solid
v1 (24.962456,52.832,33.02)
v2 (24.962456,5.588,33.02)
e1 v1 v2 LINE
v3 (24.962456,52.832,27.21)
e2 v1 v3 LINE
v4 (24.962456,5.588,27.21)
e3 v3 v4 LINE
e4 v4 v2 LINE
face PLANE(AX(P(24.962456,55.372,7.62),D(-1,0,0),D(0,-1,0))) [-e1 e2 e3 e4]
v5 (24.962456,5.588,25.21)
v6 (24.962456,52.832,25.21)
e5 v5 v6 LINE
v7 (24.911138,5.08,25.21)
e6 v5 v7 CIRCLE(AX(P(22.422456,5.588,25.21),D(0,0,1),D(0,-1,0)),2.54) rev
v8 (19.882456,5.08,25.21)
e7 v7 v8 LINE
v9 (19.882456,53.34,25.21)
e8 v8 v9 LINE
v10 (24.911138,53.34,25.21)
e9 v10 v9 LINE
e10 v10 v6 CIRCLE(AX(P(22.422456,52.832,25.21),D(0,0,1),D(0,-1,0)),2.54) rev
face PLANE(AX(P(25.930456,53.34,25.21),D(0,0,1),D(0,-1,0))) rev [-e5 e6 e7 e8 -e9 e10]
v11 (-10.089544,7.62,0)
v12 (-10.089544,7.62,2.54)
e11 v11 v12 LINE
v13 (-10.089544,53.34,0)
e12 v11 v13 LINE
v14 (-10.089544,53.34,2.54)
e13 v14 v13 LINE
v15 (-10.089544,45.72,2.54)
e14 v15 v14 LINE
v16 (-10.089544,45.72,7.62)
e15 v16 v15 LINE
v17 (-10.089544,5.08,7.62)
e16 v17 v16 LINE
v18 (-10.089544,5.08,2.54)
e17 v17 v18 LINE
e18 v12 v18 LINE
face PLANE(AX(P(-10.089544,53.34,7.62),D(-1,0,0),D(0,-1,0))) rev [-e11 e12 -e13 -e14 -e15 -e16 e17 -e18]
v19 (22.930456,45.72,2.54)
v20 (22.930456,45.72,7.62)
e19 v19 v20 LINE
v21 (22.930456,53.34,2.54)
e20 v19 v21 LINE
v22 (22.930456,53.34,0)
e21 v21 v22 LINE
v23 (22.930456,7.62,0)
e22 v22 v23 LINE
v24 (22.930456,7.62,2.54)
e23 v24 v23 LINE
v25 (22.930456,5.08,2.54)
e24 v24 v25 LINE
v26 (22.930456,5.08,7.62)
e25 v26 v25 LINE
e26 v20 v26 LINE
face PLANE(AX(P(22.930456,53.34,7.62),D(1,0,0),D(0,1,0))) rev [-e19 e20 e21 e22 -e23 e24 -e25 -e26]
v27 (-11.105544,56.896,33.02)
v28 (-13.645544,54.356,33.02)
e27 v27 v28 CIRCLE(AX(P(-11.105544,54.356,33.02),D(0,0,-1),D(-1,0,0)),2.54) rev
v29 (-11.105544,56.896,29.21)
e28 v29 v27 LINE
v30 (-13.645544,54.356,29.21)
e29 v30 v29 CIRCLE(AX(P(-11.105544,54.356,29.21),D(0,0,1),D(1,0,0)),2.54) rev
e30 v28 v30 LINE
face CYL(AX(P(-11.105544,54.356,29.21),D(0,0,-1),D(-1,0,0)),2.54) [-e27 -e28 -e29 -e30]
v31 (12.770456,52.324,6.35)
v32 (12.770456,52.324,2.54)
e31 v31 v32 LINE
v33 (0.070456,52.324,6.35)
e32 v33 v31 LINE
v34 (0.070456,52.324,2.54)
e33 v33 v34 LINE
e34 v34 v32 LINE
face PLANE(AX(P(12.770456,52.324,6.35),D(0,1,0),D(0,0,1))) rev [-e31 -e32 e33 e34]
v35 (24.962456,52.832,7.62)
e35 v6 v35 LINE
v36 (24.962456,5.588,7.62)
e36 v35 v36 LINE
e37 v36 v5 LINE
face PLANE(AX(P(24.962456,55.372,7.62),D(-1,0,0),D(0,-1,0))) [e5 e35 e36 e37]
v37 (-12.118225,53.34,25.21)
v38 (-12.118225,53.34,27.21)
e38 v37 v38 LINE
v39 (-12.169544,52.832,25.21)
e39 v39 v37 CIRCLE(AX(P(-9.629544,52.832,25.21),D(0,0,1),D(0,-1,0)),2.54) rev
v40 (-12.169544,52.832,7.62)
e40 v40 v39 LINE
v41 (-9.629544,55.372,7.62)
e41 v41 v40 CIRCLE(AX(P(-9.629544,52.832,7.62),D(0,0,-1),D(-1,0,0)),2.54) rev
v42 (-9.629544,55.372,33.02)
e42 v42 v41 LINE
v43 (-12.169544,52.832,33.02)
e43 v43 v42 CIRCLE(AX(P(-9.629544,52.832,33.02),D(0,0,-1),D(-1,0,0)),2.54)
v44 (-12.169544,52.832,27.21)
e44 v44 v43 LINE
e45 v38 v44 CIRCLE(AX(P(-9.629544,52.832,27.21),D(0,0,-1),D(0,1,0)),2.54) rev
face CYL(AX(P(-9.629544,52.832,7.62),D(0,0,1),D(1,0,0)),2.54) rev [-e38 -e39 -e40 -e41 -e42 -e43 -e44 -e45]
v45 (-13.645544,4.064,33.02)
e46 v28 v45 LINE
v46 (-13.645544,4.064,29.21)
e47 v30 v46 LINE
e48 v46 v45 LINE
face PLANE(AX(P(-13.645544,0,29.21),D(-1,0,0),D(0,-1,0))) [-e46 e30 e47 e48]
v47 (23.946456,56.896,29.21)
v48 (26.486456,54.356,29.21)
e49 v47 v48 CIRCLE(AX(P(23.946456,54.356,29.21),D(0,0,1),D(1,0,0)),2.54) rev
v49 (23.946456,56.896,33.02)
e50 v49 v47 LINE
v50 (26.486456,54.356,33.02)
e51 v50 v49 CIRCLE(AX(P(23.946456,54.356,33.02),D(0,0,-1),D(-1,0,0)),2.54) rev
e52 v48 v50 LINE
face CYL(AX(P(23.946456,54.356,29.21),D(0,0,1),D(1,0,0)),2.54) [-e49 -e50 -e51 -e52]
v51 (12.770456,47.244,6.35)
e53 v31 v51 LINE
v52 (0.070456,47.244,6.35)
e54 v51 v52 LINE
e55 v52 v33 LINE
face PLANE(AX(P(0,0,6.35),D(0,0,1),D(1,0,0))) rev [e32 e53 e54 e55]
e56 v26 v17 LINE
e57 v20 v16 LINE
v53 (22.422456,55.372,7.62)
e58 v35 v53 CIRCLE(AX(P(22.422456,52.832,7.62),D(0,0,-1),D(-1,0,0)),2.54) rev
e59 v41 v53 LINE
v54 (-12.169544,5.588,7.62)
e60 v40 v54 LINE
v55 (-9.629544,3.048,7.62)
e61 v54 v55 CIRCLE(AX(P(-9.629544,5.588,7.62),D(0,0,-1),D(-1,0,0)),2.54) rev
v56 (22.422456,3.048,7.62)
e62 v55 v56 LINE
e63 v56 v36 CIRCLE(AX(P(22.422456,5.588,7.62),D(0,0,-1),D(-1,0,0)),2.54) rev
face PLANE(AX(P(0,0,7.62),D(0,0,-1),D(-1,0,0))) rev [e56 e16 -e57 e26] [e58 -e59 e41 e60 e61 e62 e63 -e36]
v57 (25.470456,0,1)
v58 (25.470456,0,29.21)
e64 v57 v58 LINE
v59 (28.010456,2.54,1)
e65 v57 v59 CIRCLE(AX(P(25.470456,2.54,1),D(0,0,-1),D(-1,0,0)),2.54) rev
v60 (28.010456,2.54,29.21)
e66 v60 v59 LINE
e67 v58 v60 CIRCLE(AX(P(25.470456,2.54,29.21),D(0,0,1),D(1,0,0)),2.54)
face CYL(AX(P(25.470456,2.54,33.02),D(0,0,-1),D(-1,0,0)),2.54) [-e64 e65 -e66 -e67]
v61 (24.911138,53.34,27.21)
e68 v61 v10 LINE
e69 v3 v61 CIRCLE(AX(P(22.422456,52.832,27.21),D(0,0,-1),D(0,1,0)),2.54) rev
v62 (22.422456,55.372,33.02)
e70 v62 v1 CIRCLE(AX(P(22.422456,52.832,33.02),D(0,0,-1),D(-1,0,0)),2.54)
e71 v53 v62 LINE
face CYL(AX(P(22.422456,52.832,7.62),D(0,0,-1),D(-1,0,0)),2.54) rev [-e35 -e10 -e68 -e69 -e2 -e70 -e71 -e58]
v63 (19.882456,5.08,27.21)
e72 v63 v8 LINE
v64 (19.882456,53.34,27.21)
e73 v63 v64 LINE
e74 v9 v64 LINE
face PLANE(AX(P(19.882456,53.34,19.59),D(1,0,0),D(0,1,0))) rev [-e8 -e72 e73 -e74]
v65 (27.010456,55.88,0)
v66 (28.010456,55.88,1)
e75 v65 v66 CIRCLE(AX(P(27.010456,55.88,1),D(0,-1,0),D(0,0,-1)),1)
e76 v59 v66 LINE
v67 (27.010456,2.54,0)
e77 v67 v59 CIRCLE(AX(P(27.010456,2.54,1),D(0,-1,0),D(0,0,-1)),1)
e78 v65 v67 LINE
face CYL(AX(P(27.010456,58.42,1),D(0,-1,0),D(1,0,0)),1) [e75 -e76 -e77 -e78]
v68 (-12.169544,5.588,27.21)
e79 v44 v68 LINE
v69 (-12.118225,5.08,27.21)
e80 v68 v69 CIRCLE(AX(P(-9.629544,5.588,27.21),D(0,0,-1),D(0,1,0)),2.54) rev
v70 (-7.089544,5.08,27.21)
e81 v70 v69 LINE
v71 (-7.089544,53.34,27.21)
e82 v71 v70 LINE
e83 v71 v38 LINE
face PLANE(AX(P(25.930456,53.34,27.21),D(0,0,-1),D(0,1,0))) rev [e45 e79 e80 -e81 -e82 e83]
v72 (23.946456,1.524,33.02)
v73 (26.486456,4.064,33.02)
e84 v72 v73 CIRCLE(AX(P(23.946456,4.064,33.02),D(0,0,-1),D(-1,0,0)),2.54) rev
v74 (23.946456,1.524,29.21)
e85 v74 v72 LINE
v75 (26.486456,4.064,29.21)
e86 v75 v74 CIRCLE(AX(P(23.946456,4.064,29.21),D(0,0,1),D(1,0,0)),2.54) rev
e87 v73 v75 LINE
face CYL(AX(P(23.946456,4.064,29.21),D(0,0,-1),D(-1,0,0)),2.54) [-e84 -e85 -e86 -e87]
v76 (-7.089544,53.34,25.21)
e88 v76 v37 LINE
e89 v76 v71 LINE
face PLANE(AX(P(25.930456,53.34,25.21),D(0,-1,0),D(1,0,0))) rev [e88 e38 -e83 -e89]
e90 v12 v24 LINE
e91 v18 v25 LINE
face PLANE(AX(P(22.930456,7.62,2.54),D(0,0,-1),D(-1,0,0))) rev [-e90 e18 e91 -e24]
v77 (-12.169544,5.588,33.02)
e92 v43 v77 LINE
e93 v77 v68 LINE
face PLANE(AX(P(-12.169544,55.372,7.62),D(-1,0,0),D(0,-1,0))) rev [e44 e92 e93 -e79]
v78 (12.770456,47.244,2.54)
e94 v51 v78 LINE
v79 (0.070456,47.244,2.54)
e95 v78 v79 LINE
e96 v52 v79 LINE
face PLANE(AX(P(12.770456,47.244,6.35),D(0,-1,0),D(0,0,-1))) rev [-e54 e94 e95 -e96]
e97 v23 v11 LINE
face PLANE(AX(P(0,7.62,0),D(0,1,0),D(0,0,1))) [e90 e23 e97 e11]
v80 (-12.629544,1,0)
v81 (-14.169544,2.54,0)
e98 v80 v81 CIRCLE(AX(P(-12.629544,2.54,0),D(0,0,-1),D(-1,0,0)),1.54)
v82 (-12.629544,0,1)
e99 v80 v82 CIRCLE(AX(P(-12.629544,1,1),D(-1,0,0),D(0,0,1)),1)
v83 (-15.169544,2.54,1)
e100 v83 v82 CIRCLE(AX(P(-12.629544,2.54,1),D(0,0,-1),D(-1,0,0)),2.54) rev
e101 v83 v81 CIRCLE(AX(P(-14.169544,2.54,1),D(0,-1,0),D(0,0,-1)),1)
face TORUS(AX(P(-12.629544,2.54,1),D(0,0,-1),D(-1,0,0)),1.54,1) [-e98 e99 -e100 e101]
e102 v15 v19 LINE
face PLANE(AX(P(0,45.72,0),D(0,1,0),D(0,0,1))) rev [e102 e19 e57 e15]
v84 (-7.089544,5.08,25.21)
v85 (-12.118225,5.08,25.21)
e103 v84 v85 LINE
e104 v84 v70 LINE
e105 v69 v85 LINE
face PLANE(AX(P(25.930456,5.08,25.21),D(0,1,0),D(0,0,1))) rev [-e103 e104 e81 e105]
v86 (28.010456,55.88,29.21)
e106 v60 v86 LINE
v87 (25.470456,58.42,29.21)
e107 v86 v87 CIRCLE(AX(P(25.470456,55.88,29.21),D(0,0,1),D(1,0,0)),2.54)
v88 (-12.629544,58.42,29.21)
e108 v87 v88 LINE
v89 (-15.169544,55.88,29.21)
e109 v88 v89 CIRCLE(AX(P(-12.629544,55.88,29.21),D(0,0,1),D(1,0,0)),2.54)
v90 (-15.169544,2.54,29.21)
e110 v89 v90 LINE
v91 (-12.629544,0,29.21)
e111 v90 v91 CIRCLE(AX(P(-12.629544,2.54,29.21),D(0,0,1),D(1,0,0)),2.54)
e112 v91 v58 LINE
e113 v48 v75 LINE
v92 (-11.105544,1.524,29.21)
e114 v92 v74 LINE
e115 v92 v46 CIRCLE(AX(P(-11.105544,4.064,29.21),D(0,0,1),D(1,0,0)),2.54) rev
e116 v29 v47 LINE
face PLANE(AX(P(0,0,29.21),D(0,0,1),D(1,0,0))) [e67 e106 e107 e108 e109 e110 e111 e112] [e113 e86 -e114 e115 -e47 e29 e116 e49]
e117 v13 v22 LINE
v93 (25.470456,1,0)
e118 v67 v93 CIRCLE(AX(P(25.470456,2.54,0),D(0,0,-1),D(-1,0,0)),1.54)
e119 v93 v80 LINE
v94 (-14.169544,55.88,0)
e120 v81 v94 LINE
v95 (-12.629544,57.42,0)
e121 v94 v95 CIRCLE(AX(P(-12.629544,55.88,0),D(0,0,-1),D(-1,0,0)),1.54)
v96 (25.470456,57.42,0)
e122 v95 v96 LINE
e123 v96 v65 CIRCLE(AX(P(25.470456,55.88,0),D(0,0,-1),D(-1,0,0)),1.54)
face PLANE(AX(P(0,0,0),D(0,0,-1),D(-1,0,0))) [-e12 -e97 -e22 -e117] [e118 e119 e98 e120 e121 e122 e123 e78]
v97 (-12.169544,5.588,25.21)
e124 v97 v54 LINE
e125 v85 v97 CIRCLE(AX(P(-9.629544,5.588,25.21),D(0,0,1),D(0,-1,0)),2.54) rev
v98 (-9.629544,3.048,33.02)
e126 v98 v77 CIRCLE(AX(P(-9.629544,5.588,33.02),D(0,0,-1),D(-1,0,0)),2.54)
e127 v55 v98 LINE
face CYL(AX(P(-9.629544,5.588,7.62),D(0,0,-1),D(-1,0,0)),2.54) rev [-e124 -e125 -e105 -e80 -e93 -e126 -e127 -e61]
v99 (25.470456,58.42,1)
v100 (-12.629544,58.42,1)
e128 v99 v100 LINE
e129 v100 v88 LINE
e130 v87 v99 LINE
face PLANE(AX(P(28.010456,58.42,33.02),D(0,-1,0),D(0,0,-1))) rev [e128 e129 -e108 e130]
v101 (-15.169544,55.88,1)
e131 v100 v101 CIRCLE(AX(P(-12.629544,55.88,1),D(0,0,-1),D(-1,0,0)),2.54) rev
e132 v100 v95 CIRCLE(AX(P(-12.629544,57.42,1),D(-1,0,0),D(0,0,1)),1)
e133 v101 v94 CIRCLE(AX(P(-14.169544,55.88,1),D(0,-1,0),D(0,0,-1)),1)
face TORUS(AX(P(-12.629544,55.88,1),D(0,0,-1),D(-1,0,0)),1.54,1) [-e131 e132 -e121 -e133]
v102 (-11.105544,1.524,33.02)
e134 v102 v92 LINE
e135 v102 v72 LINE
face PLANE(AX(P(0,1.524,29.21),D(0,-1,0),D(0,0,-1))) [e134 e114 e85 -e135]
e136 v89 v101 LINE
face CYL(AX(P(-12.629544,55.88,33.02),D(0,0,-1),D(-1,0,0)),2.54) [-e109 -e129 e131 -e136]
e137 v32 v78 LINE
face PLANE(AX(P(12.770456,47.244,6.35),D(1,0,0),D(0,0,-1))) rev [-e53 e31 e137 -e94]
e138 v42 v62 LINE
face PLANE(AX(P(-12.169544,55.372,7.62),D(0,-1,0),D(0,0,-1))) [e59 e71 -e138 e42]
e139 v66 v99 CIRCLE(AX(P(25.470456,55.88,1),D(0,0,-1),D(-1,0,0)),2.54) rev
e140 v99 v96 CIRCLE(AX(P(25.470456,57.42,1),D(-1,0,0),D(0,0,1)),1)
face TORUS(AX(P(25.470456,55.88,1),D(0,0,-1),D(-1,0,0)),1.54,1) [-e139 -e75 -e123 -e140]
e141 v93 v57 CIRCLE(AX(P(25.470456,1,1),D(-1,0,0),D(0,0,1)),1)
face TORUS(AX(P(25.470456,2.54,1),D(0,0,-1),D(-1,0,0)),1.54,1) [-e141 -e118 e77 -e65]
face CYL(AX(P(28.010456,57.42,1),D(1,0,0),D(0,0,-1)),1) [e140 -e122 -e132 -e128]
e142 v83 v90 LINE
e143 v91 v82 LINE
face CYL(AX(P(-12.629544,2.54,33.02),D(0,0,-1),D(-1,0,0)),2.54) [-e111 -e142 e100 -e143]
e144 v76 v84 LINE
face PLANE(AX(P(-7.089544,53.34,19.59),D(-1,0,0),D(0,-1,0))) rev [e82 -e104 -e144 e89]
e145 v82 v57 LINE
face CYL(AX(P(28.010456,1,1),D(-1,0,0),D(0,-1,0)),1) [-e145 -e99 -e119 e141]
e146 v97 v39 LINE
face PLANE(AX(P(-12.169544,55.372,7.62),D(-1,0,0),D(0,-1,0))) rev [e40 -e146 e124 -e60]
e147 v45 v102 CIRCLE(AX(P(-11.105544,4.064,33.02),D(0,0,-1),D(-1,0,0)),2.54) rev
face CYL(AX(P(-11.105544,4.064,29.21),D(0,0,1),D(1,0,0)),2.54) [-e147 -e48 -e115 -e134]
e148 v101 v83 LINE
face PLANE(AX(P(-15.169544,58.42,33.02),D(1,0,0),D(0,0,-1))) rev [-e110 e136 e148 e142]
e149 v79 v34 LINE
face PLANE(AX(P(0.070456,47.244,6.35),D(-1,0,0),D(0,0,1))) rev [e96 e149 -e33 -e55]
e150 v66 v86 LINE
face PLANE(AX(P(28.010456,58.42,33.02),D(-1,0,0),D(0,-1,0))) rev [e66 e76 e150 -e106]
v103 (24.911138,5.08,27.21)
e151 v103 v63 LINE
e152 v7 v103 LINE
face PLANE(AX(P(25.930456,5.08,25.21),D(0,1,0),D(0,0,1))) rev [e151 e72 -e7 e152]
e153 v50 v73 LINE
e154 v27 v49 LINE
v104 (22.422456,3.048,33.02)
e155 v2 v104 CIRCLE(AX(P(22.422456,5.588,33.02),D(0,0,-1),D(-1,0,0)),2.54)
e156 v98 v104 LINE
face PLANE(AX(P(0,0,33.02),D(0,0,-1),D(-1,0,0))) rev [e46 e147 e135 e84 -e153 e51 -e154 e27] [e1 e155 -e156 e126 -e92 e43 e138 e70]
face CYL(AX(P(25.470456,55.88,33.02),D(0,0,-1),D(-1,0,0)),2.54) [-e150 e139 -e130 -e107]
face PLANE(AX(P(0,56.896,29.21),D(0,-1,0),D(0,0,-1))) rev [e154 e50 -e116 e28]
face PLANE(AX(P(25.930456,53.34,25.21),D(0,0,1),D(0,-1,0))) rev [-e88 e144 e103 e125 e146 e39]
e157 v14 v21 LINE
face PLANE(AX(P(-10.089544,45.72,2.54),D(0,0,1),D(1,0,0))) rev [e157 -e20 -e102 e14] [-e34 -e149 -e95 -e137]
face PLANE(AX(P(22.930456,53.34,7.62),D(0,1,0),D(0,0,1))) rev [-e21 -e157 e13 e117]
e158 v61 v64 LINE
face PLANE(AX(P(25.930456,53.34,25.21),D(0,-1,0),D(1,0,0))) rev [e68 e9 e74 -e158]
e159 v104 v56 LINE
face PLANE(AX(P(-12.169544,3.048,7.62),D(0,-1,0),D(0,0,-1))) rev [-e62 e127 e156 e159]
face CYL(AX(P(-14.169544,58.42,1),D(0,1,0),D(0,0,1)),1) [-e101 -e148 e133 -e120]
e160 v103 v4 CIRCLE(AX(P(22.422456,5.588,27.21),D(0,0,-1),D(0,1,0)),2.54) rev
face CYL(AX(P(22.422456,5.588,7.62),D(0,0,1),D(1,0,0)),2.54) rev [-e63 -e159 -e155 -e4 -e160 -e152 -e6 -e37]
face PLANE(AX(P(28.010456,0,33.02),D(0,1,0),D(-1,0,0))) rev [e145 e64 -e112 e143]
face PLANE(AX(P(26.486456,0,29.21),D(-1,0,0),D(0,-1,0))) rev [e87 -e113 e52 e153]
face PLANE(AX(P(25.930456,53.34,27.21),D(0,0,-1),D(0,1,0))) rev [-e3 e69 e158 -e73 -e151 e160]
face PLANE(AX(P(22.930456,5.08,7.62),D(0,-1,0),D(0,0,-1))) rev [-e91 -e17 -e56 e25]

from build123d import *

# Parameters (mm, degrees)
SKETCH1_W           = 43.18
SKETCH1_H           = 58.42
BOSS_EXTRUDE1_DEPTH = 33.02
SKETCH2_W           = 37.132
SKETCH2_H           = 52.324
CUT_EXTRUDE1_DEPTH  = 25.4
SKETCH2_6_W         = 43.18
SKETCH2_6_H         = 58.42
SKETCH2_6_W_2       = 40.132
SKETCH2_6_H_2       = 55.372
CUT_EXTRUDE3_DEPTH  = 3.81
SKETCH5_W           = 2
SKETCH5_H           = 48.26
BOSS_EXTRUDE2_DEPTH = 38.1
SKETCH6_W           = 26.972
SKETCH6_H           = 48.26
CUT_EXTRUDE4_DEPTH  = 7.62
SKETCH8_W           = 33.02
SKETCH8_H           = 48.26
CUT_EXTRUDE5_DEPTH  = 7.62
SKETCH9_W           = 33.02
SKETCH9_H           = 2.54
BOSS_EXTRUDE3_DEPTH = 2.54
SKETCH11_W          = 33.02
SKETCH11_H          = 5.08
BOSS_EXTRUDE4_DEPTH = 7.62
SKETCH12_W          = 12.7
SKETCH12_H          = 5.08
CUT_EXTRUDE6_DEPTH  = 3.81
FILLET1_R           = 2.54
FILLET2_R           = 2.54
FILLET3_R           = 2.54
FILLET4_R           = 2.54
FILLET5_R           = 1


with BuildPart() as part:
    # Sketch1 → Boss-Extrude1 (new body)
    with BuildSketch(Plane.XY):
        with Locations((6.420456459, 29.21)):
            Rectangle(SKETCH1_W, SKETCH1_H)
    extrude(amount=BOSS_EXTRUDE1_DEPTH)

    # Sketch2 → Cut-Extrude1 (cut)
    with BuildSketch(Plane.XY.offset(33.02)):
        with Locations((6.396456459, 29.21)):
            Rectangle(SKETCH2_W, SKETCH2_H)
    extrude(amount=-CUT_EXTRUDE1_DEPTH, mode=Mode.SUBTRACT)

    # Sketch2<6> → Cut-Extrude3 (cut)
    with BuildSketch(Plane.XY.offset(33.02)):
        with Locations((6.420456459, 29.21)):
            Rectangle(SKETCH2_6_W, SKETCH2_6_H)
        with Locations((6.420456459, 29.21)):
            Rectangle(SKETCH2_6_W_2, SKETCH2_6_H_2, mode=Mode.SUBTRACT)
    extrude(amount=-CUT_EXTRUDE3_DEPTH, mode=Mode.SUBTRACT)

    # Sketch5 → Boss-Extrude2 (add)
    with BuildSketch(Plane(origin=(-12.169543541, 0, 0), x_dir=(0, 0, -1), z_dir=(1, 0, 0))):
        with Locations((-26.21, 29.21)):
            Rectangle(SKETCH5_W, SKETCH5_H)
    extrude(amount=BOSS_EXTRUDE2_DEPTH)

    # Sketch6 → Cut-Extrude4 (cut)
    with BuildSketch(Plane.XY.offset(27.21)):
        with Locations((6.396456459, 29.21)):
            Rectangle(SKETCH6_W, SKETCH6_H)
    extrude(amount=-CUT_EXTRUDE4_DEPTH, mode=Mode.SUBTRACT)

    # Sketch8 → Cut-Extrude5 (cut)
    with BuildSketch(Plane(origin=(0, 0, 0), x_dir=(-1, 0, 0), z_dir=(0, 0, -1))):
        with Locations((-6.420456459, 29.21)):
            Rectangle(SKETCH8_W, SKETCH8_H)
    extrude(amount=-CUT_EXTRUDE5_DEPTH, mode=Mode.SUBTRACT)

    # Sketch9 → Boss-Extrude3 (add)
    with BuildSketch(Plane(origin=(0, 5.08, 0), x_dir=(1, 0, 0), z_dir=(0, 1, 0))):
        with Locations((6.420456459, -1.27)):
            Rectangle(SKETCH9_W, SKETCH9_H)
    extrude(amount=BOSS_EXTRUDE3_DEPTH)

    # Sketch11 → Boss-Extrude4 (add)
    with BuildSketch(Plane.XZ.offset(-53.34)):
        with Locations((6.420456459, 5.08)):
            Rectangle(SKETCH11_W, SKETCH11_H)
    extrude(amount=BOSS_EXTRUDE4_DEPTH)

    # Sketch12 → Cut-Extrude6 (cut)
    with BuildSketch(Plane(origin=(0, 0, 2.54), x_dir=(-1, 0, 0), z_dir=(0, 0, -1))):
        with Locations((-6.420456459, 49.784)):
            Rectangle(SKETCH12_W, SKETCH12_H)
    extrude(amount=-CUT_EXTRUDE6_DEPTH, mode=Mode.SUBTRACT)

    # Fillet1
    # the kernel refuses this fillet: 2.54 mm, written as the material it adds along each edge
    with BuildSketch(Plane(origin=(-12.169543541, 3.048, 33.02), x_dir=(1, 0, 0), z_dir=(0, 0, -1)), Plane(origin=(24.962456459, 55.372, 33.02), x_dir=(-1, 0, 0), z_dir=(0, 0, -1)), Plane(origin=(24.962456459, 3.048, 33.02), x_dir=(0, 1, 0), z_dir=(0, 0, -1))) as fillet1_piece_1:
        with BuildLine():
            CenterArc((FILLET1_R, -FILLET1_R), FILLET1_R, 90, 90)
            Line((0, -FILLET1_R), (0, 0))
            Line((0, 0), (FILLET1_R, 0))
        make_face()
    extrude(amount=31.75)
    with BuildSketch(Plane(origin=(-12.169543541, 55.372, 33.02), x_dir=(1, 0, 0), z_dir=(0, 0, -1))) as fillet1_piece_2:
        with BuildLine():
            CenterArc((FILLET1_R, FILLET1_R), FILLET1_R, 180, 90)
            Line((0, FILLET1_R), (0, 0))
            Line((0, 0), (FILLET1_R, 0))
        make_face()
    extrude(amount=31.75)

    # Fillet2
    fillet2_edges = [part.edges().sort_by_distance(p)[0] for p in [
        (-15.169543541, 58.42, 14.605),
        (28.010456459, 58.42, 14.605),
        (26.486456459, 56.896, 31.115),
        (-13.645543541, 56.896, 31.115),
    ]]
    fillet(fillet2_edges, radius=FILLET2_R)

    # Fillet3
    fillet3_edges = [part.edges().sort_by_distance(p)[0] for p in [
        (-15.169543541, 0, 14.605),
        (-13.645543541, 1.524, 31.115),
    ]]
    fillet(fillet3_edges, radius=FILLET3_R)

    # Fillet4
    fillet4_edges = [part.edges().sort_by_distance(p)[0] for p in [
        (28.010456459, 0, 14.605),
        (26.486456459, 1.524, 31.115),
    ]]
    fillet(fillet4_edges, radius=FILLET4_R)

    # Fillet5
    fillet5_edges = [part.edges().sort_by_distance(p)[0] for p in [
        (-15.169543541, 29.21, 0),
        (6.420456459, 58.42, 0),
        (27.266507683, 57.676051224, 0),
        (-14.425594766, 57.676051224, 0),
        (6.420456459, 0, 0),
        (-14.425594766, 0.743948776, 0),
        (28.010456459, 29.21, 0),
        (27.266507683, 0.743948776, 0),
    ]]
    fillet(fillet5_edges, radius=FILLET5_R)


solid = part.part
